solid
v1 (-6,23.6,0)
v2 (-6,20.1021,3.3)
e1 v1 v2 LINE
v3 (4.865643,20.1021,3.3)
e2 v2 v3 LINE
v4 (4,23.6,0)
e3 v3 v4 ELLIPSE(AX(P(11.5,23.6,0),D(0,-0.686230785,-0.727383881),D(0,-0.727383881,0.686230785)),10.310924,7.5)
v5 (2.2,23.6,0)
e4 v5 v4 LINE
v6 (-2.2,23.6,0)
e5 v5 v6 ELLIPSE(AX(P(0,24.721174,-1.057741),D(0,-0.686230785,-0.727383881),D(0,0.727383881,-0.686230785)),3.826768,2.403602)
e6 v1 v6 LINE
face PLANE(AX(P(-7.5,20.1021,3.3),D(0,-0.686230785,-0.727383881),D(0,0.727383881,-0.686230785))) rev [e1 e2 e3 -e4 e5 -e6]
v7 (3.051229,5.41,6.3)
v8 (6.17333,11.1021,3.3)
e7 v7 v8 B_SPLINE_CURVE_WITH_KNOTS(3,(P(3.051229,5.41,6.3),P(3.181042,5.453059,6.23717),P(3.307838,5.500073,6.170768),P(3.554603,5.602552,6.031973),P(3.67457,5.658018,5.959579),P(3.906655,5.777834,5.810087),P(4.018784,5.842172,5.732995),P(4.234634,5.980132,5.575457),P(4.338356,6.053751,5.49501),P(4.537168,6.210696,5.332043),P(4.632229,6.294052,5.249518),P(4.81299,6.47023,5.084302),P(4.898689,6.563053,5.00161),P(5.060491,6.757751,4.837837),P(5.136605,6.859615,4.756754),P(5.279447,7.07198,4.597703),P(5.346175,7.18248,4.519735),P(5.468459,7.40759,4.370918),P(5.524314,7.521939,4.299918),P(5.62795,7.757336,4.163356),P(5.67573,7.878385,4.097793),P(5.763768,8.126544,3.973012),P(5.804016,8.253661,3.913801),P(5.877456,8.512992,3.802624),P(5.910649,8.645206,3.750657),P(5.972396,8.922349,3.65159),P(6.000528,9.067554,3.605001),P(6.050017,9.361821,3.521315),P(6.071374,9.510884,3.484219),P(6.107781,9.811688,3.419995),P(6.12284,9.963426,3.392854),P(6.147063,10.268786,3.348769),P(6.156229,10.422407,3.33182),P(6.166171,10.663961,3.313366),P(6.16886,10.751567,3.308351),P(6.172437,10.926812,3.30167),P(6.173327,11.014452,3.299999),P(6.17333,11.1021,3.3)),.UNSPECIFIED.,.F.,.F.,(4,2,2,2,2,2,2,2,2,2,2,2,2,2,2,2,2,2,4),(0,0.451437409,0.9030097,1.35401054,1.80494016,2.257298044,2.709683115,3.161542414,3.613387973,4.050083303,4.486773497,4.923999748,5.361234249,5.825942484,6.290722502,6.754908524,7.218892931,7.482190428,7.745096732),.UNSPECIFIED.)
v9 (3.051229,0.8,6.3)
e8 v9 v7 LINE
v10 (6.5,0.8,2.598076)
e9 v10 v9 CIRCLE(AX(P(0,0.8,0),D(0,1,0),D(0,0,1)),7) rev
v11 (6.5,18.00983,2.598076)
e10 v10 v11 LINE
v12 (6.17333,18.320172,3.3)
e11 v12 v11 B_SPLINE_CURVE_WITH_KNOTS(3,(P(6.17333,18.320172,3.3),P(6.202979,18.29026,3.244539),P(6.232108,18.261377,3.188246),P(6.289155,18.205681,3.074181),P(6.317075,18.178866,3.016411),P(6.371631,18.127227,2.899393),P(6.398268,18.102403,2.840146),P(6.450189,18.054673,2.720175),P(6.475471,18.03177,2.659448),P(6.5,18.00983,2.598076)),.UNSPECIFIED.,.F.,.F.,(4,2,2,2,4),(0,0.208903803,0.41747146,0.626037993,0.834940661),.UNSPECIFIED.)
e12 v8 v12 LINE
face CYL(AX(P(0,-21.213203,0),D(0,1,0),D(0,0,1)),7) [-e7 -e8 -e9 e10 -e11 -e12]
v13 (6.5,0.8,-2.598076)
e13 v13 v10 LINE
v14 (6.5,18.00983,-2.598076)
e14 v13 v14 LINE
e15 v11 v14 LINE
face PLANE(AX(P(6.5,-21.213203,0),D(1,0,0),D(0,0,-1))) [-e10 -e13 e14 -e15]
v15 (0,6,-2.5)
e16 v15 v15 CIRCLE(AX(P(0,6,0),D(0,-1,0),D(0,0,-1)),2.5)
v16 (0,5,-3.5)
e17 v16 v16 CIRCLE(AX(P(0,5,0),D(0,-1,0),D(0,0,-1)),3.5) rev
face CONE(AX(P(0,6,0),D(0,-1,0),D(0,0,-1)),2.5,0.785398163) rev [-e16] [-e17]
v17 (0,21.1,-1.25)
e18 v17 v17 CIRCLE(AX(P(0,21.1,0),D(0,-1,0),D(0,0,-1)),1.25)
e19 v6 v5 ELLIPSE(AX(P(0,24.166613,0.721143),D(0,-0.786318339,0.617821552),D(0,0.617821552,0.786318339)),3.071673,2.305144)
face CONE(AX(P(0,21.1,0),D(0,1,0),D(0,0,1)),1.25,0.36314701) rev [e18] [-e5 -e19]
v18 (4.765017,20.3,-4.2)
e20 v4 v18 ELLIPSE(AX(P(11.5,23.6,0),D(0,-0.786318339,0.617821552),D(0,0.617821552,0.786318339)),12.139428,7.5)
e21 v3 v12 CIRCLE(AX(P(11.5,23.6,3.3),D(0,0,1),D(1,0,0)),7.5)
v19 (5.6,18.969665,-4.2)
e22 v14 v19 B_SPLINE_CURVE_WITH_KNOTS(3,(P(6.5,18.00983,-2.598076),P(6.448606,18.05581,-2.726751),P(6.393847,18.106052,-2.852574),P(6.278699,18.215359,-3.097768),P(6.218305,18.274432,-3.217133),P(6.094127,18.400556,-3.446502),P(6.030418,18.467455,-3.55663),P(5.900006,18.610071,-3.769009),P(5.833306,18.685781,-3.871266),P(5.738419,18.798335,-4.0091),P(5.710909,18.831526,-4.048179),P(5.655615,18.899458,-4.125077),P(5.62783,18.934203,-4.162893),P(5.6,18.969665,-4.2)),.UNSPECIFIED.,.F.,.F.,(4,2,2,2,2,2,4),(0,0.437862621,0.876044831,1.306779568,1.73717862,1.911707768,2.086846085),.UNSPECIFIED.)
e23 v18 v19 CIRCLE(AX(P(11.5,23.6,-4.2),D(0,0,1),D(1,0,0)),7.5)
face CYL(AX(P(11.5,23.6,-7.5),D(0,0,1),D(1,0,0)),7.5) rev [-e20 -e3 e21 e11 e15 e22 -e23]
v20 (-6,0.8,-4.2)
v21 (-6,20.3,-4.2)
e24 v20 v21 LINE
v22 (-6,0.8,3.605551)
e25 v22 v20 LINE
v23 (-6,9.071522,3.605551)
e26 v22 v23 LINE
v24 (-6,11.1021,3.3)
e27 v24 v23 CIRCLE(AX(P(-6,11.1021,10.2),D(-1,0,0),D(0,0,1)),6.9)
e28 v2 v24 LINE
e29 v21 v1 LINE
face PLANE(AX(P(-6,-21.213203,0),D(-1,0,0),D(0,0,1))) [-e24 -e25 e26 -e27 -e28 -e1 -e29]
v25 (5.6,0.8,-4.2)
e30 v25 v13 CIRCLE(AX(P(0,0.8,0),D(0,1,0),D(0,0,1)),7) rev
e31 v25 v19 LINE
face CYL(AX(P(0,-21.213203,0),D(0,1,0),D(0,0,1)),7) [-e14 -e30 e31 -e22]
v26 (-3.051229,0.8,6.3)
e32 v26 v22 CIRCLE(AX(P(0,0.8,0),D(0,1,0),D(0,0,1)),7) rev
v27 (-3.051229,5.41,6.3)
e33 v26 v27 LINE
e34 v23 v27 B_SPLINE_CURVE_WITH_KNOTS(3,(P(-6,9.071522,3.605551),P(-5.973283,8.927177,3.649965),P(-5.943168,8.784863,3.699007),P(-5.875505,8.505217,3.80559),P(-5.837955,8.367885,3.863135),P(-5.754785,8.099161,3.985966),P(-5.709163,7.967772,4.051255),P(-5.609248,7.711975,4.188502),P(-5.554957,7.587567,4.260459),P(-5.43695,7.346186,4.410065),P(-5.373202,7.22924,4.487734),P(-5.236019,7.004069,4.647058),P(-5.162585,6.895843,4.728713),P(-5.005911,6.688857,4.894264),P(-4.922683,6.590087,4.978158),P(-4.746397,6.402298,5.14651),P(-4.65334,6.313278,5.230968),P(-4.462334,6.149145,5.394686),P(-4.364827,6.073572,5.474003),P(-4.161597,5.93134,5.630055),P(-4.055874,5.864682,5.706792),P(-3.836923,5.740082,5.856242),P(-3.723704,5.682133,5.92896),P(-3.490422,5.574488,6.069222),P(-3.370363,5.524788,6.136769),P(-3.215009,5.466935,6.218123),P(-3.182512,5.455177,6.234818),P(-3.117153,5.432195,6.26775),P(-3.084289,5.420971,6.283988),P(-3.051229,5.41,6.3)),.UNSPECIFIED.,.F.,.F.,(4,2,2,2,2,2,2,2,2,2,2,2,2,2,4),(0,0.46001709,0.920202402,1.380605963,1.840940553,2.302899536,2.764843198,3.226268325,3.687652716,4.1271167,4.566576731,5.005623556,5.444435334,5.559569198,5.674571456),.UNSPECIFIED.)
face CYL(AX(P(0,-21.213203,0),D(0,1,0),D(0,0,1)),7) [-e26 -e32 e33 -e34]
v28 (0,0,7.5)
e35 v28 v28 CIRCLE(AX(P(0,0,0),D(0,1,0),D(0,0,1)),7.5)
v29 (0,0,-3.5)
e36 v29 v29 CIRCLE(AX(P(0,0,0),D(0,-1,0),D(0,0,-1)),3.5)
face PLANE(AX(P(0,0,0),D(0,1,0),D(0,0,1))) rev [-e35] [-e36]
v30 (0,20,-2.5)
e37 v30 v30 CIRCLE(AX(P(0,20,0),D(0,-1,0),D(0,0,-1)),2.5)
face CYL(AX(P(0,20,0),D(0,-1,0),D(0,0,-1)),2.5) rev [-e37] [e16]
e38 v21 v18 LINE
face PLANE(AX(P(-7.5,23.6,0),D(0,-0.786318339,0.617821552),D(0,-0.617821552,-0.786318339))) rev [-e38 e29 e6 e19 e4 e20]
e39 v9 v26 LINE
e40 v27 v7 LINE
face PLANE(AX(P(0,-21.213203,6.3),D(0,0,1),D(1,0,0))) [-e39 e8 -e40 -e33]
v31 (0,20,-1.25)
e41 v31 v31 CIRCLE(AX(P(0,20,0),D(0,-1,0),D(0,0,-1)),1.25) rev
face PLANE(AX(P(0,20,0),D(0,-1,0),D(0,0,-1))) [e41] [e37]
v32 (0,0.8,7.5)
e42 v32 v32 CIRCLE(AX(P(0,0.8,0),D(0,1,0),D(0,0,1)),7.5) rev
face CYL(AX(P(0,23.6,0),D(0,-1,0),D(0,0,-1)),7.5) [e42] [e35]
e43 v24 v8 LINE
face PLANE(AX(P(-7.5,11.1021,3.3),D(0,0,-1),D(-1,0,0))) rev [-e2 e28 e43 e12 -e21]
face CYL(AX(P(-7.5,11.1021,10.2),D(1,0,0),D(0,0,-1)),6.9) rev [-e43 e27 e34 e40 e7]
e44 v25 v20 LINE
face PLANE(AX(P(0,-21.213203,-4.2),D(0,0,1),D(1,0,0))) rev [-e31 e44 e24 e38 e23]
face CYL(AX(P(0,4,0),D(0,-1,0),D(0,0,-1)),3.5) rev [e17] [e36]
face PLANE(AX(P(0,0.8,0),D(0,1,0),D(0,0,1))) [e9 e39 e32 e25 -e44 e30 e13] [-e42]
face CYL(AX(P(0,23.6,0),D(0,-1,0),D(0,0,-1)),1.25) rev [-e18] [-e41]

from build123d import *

# Parameters (mm, degrees)
ESBO_O1_R                = 7.5
ESBO_O1_R_2              = 1.25
RESSALTO_EXTRUS_O1_DEPTH = 23.6
CORTE_EXTRUS_O1_START    = -22.8
ESBO_O2_R                = 7.5
CORTE_EXTRUS_O1_DEPTH    = 22.8
CORTE_EXTRUS_O2_DEPTH    = 29.446616671
ESBO_O4_R                = 3.5
ESBO_O4_R_2              = 2.5
ESBO_O4_R_3              = 1.25
CORTE_EXTRUS_O3_DEPTH    = 4
ESBO_O4_3_R              = 2.5
ESBO_O4_3_R_2            = 1.25
CORTE_EXTRUS_O4_DEPTH    = 20
ESBO_O5_R                = 2.2
ESBO_O6_R                = 1.25
ESBO_O7_R                = 7.5
CORTE_EXTRUS_O5_DEPTH    = 28.015736242
CHANFRO1_SIZE            = 2


with BuildPart() as part:
    # Esboço1 → Ressalto-extrusão1 (new body)
    with BuildSketch(Plane(origin=(0, 0, 0), x_dir=(1, 0, 0), z_dir=(0, 1, 0))):
        with Locations(Location((0, 0, 0), (0, 0, 270))):
            Circle(ESBO_O1_R)
        with Locations(Location((0, 0, 0), (0, 0, 270))):
            Circle(ESBO_O1_R_2, mode=Mode.SUBTRACT)
    extrude(amount=RESSALTO_EXTRUS_O1_DEPTH)

    # Esboço2 → Corte-extrusão1 (cut)
    with BuildSketch(Plane(origin=(0, 23.6, 0), x_dir=(1, 0, 0), z_dir=(0, 1, 0)).offset(CORTE_EXTRUS_O1_START)):
        with Locations(Location((0, 0, 0), (0, 0, 270))):
            Circle(ESBO_O2_R)
        with BuildLine():
            ThreePointArc((-6, -3.605551275), (-4.721885351, -5.167571841), (-3.05122926, -6.3))
            Line((-3.05122926, -6.3), (3.05122926, -6.3))
            ThreePointArc((3.05122926, -6.3), (5.121772645, -4.771524386), (6.5, -2.598076211))
            Line((6.5, -2.598076211), (6.5, 2.598076211))
            ThreePointArc((6.5, 2.598076211), (6.102789523, 3.428696552), (5.6, 4.2))
            Line((5.6, 4.2), (-6, 4.2))
            Line((-6, 4.2), (-6, -3.605551275))
        make_face(mode=Mode.SUBTRACT)
    extrude(amount=CORTE_EXTRUS_O1_DEPTH, mode=Mode.SUBTRACT)

    # Esboço3 → Corte-extrusão2 (cut, through all)
    with BuildSketch(Plane(origin=(6.5, 0, 0), x_dir=(0, 0, -1), z_dir=(1, 0, 0))):
        with BuildLine():
            Line((-6.3, 0.8), (-6.3, 5.41))
            ThreePointArc((-6.3, 5.41), (-4.095903015, 7.8849582), (-3.3, 11.102099788))
            Line((-3.3, 11.102099788), (-3.3, 20.102099788))
            Line((-3.3, 20.102099788), (0, 23.6))
            Line((0, 23.6), (4.2, 20.3))
            Line((4.2, 20.3), (4.2, 26.498132866))
            Line((4.2, 26.498132866), (-7.5, 26.498132866))
            Line((-7.5, 26.498132866), (-7.5, 0.8))
            Line((-7.5, 0.8), (-6.3, 0.8))
        make_face()
    extrude(amount=-CORTE_EXTRUS_O2_DEPTH, mode=Mode.SUBTRACT)

    # Esboço4 → Corte-extrusão3 (cut)
    # profile 1 of 2: a face of its own
    with BuildSketch(Plane.XZ):
        with Locations(Location((0, 0, 0), (0, 0, 270))):
            Circle(ESBO_O4_R)
        Circle(ESBO_O4_R_2, mode=Mode.SUBTRACT)
    # profile 2 of 2: a face of its own
    with BuildSketch(Plane.XZ):
        Circle(ESBO_O4_R_2)
        with Locations(Location((0, 0, 0), (0, 0, 270))):
            Circle(ESBO_O4_R_3, mode=Mode.SUBTRACT)
    extrude(amount=-CORTE_EXTRUS_O3_DEPTH, mode=Mode.SUBTRACT)

    # Esboço4<3> → Corte-extrusão4 (cut)
    with BuildSketch(Plane.XZ):
        with Locations(Location((0, 0, 0), (0, 0, 270))):
            Circle(ESBO_O4_3_R)
        with Locations(Location((0, 0, 0), (0, 0, 270))):
            Circle(ESBO_O4_3_R_2, mode=Mode.SUBTRACT)
    extrude(amount=-CORTE_EXTRUS_O4_DEPTH, mode=Mode.SUBTRACT)

    # Esboço5 → Loft de corte1 section 0
    with BuildSketch(Plane(origin=(0, 23.6, 0), x_dir=(1, 0, 0), z_dir=(0, 1, 0))):
        Circle(ESBO_O5_R)
    # Esboço6 → Loft de corte1 section 1
    with BuildSketch(Plane(origin=(0, 21.1, 0), x_dir=(-1, 0, 0), z_dir=(0, -1, 0))):
        Circle(ESBO_O6_R)
    loft(mode=Mode.SUBTRACT)

    # Esboço7 → Corte-extrusão5 (cut, through all)
    with BuildSketch(Plane.XY.offset(3.3)):
        with Locations((11.5, 23.6)):
            Circle(ESBO_O7_R)
    extrude(amount=-CORTE_EXTRUS_O5_DEPTH, mode=Mode.SUBTRACT)

    # Chanfro1
    # the kernel refuses this chamfer: 2 mm, written as the material it takes off along each edge
    with BuildSketch(Plane(origin=(0, 4, 0), x_dir=(0, 0, -1), z_dir=(-1, 0, 0))) as chanfro1_piece_1_section:
        Polygon((2.5 + CHANFRO1_SIZE, 0), (2.5, -CHANFRO1_SIZE), (2.5, 0), align=None)
    chanfro1_piece_1 = revolve(axis=Axis((0, 4, 0), (0, -1, 0)), mode=Mode.PRIVATE)
    chanfro1_piece_1 = chanfro1_piece_1 & Plane(origin=(0, 5.506317811, 0), x_dir=(0, 0, -1), z_dir=(0, -1, 0)) * Cylinder(3.5, 18, mode=Mode.PRIVATE)
    add(chanfro1_piece_1, mode=Mode.SUBTRACT)


solid = part.part
